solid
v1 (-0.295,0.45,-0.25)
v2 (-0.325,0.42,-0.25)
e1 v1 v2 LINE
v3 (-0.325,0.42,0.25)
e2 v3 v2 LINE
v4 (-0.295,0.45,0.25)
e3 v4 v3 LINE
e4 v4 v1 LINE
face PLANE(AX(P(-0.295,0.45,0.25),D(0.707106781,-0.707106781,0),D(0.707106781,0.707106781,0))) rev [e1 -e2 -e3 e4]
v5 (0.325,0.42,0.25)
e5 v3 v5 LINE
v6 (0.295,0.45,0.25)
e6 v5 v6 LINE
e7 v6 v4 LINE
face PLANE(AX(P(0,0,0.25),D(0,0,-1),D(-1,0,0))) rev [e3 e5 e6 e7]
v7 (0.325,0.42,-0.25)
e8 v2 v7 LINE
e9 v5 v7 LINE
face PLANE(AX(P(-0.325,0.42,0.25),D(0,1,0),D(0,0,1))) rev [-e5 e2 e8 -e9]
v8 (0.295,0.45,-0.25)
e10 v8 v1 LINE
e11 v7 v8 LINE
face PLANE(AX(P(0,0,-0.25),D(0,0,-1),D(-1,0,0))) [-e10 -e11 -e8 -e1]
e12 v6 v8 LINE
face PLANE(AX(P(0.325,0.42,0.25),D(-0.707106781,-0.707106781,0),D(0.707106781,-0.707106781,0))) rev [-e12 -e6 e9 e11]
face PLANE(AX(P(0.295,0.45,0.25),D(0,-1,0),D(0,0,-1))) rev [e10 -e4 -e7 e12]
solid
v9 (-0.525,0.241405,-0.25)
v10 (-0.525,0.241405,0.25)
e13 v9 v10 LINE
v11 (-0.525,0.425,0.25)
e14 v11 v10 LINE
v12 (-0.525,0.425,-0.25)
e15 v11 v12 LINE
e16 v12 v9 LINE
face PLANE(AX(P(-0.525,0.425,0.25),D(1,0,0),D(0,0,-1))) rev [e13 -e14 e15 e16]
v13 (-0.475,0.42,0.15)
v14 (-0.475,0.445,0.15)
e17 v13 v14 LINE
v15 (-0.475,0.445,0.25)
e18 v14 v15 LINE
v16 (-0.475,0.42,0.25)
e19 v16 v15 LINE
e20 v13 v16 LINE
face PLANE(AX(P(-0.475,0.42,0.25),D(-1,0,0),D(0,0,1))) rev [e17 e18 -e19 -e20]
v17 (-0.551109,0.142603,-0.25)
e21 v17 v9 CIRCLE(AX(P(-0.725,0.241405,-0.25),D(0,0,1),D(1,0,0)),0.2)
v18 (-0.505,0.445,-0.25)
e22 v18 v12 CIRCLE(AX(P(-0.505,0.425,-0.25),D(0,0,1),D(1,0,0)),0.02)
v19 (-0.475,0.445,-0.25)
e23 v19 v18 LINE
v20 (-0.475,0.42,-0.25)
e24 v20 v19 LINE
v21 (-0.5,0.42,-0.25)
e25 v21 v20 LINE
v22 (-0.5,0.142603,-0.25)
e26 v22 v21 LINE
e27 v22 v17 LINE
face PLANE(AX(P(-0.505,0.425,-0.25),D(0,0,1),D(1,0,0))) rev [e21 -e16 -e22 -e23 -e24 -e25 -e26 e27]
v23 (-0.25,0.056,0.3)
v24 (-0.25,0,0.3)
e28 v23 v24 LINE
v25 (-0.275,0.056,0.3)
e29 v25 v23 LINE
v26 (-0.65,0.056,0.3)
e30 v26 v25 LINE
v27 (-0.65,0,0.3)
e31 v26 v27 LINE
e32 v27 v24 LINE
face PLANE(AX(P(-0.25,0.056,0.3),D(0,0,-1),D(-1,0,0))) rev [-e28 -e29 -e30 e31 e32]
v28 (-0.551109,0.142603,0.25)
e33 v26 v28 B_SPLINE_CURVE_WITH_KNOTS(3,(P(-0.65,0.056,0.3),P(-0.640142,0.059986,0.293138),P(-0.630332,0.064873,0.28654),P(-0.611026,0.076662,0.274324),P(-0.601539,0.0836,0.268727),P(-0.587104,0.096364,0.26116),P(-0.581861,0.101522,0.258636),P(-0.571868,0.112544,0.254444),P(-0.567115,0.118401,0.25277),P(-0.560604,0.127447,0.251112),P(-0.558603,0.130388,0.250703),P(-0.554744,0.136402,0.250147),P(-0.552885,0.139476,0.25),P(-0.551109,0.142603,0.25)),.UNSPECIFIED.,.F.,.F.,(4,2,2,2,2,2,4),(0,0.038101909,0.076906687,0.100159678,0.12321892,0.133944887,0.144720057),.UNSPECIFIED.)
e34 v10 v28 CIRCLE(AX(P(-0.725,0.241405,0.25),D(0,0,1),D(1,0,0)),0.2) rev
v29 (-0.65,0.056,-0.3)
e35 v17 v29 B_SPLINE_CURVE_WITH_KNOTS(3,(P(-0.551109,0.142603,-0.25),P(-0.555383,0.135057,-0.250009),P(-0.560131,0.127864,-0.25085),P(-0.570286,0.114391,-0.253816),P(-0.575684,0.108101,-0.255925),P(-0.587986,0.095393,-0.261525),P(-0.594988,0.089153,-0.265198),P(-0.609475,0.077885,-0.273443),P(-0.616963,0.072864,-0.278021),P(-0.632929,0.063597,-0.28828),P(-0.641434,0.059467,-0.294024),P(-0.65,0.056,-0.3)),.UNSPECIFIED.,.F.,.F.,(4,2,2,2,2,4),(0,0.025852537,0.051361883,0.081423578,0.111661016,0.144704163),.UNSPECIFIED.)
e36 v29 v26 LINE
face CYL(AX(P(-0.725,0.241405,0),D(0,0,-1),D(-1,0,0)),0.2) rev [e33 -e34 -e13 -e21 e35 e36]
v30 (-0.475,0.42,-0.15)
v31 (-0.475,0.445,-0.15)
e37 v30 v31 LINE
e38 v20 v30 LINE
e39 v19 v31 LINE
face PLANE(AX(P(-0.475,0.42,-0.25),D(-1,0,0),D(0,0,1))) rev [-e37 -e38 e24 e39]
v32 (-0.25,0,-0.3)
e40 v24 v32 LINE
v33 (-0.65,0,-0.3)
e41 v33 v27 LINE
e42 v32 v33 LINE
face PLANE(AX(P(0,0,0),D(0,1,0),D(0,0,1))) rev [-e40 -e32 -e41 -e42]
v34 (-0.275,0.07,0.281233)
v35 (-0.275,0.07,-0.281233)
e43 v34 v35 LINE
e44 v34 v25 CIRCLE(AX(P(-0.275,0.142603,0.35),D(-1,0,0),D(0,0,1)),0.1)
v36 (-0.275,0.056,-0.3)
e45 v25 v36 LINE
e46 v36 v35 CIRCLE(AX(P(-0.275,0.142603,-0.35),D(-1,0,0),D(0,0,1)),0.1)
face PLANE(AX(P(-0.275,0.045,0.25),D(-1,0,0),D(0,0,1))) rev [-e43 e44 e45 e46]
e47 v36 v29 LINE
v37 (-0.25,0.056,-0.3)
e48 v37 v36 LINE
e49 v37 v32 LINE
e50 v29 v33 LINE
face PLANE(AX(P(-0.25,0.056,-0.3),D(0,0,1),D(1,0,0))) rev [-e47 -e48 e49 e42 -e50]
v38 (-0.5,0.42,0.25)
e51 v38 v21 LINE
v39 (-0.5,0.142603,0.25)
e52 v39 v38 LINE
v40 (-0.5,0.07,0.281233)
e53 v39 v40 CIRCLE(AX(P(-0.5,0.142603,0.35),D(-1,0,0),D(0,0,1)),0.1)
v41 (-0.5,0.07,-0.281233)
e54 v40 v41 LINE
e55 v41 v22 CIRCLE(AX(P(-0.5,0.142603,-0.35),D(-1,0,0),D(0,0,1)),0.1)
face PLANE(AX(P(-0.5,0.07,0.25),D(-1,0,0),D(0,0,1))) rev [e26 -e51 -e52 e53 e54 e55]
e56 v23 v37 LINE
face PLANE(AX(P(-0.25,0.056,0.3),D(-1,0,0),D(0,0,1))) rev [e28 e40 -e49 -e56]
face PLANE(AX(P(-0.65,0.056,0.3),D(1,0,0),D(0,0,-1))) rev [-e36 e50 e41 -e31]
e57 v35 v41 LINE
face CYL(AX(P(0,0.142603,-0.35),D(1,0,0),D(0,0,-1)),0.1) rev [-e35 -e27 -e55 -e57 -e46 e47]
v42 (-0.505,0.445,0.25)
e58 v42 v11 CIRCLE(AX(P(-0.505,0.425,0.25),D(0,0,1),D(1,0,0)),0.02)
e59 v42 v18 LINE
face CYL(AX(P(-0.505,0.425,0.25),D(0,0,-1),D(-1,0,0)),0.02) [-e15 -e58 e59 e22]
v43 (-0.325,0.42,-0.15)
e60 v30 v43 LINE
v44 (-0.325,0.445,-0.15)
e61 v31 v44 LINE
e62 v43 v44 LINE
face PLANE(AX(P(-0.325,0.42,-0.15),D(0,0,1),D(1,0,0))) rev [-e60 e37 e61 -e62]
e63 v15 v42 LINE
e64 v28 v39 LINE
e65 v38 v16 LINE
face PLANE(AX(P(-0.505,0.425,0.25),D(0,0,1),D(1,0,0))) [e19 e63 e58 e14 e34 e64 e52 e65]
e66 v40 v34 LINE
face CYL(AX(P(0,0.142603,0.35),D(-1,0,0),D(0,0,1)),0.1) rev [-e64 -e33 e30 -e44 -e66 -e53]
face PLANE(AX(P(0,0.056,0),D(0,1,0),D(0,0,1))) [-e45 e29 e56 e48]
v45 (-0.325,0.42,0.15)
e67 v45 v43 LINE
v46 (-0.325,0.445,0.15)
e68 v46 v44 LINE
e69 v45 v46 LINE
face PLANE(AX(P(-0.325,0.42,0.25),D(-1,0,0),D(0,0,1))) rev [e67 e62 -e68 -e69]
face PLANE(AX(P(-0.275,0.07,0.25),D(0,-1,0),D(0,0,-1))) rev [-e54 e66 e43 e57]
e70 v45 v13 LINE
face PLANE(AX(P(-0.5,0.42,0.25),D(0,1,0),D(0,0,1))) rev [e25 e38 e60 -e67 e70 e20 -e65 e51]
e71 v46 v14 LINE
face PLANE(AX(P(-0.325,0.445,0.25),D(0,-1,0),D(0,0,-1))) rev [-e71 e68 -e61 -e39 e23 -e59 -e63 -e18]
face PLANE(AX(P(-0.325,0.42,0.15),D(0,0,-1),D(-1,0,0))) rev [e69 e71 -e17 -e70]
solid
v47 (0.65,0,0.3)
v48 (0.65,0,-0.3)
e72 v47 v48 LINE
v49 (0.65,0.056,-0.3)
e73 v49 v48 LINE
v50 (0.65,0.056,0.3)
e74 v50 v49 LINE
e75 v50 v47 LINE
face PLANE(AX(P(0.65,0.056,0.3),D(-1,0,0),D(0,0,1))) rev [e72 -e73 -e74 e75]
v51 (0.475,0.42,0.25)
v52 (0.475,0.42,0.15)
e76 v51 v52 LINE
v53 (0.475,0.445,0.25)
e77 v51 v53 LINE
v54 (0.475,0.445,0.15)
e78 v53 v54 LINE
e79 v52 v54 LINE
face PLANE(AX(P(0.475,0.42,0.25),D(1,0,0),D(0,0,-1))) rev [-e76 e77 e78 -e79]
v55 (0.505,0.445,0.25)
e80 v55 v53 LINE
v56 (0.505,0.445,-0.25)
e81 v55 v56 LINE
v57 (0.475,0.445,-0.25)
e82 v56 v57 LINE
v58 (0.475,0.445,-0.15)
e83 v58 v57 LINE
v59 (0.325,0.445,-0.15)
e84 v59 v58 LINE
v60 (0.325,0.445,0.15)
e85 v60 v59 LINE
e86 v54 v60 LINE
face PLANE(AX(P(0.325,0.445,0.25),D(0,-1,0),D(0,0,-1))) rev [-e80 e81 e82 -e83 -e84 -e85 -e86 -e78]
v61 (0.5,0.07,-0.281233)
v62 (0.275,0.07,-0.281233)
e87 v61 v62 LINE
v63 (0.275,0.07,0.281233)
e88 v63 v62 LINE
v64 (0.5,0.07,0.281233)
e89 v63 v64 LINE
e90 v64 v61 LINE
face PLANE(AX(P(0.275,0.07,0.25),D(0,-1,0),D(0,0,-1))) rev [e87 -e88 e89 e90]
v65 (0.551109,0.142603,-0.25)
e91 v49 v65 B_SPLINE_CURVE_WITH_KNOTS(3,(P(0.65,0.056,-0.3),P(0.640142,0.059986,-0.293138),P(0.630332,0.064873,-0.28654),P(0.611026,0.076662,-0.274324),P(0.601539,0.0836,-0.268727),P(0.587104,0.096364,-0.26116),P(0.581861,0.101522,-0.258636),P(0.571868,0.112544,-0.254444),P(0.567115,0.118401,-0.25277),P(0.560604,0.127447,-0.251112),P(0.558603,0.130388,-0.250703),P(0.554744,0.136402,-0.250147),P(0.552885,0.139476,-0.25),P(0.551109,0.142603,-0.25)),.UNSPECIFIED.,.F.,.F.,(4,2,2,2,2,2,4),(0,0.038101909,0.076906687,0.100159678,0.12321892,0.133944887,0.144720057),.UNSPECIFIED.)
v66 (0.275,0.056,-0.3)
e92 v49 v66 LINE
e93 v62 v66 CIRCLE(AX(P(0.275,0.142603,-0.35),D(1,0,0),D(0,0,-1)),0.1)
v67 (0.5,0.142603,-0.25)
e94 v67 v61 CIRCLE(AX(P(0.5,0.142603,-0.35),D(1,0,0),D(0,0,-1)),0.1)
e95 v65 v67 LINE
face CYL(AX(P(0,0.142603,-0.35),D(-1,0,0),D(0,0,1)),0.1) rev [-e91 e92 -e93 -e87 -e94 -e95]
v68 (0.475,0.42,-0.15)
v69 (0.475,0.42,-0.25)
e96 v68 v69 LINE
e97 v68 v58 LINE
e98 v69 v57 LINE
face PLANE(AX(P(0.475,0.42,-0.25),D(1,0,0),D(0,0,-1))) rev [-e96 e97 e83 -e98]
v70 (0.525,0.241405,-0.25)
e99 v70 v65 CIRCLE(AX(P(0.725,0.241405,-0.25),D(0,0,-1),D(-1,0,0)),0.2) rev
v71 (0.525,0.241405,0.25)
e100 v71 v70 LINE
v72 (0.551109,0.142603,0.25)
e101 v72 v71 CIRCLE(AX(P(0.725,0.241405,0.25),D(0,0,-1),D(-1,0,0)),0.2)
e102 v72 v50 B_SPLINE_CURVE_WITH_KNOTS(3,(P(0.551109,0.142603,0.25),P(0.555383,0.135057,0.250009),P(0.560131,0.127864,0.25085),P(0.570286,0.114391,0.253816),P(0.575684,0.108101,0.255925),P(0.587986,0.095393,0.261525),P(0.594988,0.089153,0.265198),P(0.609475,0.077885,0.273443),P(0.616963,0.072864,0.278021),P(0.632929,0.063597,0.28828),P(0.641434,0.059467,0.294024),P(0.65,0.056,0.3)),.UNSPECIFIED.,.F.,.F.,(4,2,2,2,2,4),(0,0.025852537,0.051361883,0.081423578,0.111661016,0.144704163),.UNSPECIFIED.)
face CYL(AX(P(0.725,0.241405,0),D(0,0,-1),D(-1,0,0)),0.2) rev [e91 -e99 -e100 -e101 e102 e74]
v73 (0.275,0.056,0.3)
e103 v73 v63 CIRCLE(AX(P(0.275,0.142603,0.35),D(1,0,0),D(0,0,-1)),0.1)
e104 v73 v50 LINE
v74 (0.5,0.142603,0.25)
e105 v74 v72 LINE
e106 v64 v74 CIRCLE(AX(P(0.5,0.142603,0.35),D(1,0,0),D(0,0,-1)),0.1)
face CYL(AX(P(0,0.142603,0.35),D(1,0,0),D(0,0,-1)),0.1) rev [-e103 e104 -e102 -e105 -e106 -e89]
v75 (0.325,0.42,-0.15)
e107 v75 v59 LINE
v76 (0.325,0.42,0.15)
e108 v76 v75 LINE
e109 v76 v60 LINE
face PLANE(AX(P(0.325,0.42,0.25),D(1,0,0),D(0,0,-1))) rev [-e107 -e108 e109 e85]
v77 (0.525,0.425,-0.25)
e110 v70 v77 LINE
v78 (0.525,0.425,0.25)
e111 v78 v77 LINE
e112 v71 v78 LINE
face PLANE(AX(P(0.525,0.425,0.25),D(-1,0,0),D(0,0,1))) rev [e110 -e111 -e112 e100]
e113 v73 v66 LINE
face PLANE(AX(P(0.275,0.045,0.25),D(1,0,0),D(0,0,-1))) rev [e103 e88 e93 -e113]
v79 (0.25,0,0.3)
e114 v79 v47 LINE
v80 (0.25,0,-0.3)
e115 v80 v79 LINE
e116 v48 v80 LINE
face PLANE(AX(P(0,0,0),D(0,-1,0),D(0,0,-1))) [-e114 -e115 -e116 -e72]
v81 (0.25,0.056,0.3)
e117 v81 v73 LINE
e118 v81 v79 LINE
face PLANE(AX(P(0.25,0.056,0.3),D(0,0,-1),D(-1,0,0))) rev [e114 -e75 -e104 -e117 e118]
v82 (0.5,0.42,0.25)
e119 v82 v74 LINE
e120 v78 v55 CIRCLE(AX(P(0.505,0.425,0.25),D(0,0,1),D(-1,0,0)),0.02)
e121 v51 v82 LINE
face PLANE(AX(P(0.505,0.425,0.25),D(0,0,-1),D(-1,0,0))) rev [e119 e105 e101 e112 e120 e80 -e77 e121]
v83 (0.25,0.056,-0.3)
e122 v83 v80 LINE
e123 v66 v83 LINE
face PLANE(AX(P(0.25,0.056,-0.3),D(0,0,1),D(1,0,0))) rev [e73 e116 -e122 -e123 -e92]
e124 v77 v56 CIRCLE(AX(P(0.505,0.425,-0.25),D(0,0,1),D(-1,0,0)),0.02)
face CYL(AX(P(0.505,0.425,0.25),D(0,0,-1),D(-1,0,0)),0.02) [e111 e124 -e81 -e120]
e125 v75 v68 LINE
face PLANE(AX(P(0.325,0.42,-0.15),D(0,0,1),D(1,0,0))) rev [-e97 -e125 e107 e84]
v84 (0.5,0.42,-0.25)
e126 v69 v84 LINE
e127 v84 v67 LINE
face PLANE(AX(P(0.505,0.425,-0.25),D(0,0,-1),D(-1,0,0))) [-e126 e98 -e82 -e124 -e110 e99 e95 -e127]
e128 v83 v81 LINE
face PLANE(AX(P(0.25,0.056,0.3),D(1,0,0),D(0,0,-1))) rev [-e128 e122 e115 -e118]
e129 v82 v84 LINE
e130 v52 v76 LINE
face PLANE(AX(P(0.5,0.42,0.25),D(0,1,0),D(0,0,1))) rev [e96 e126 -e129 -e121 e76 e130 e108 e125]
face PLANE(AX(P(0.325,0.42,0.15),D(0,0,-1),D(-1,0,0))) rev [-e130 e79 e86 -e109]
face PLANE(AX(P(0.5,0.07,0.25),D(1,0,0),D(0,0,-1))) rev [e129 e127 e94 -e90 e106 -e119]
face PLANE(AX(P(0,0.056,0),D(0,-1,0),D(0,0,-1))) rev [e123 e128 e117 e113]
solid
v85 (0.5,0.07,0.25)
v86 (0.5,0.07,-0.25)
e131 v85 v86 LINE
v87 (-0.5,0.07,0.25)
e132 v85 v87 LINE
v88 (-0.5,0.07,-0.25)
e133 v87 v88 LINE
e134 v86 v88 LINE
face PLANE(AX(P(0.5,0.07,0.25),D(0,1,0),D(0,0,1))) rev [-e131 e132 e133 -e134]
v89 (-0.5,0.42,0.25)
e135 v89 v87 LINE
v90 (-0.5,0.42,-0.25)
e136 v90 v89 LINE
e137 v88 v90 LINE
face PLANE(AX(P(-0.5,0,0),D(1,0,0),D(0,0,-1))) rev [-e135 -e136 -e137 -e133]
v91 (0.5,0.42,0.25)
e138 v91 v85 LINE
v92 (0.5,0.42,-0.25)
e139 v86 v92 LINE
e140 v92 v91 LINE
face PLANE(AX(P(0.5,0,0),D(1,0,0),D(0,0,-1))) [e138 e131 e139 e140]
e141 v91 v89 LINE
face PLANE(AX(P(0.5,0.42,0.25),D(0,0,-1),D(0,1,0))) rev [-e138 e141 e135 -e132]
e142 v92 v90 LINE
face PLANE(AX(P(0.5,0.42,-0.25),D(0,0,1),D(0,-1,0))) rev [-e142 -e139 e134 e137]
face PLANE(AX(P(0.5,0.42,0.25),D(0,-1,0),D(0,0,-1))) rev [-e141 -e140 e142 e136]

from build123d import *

# Parameters (mm, degrees)
SKETCH1_W             = 0.5
SKETCH1_H             = 0.35
BOSS_EXTRUDE1_DEPTH   = 0.5
BOSS_EXTRUDE2_DEPTH   = 0.25
BOSS_EXTRUDE2_2_DEPTH = 0.25
SKETCH3_W             = 0.15
SKETCH3_H             = 0.1
CUT_EXTRUDE1_DEPTH    = 0.025
BOSS_EXTRUDE3_DEPTH   = 0.25
SKETCH7_W             = 0.4
SKETCH7_H             = 0.6
BOSS_EXTRUDE5_DEPTH   = 0.056
FILLET3_R             = 0.2
FILLET4_R             = 0.2
FILLET5_R             = 0.1
FILLET6_R             = 0.1


with BuildPart() as part:
    # Sketch1 → Boss-Extrude1 (new, symmetric)
    with BuildSketch(Plane(origin=(0, 0, 0), x_dir=(0, 0, -1), z_dir=(1, 0, 0))):
        with Locations((0, 0.245)):
            Rectangle(SKETCH1_W, SKETCH1_H)
    extrude(amount=BOSS_EXTRUDE1_DEPTH, both=True)


with BuildPart() as body_2:
    # Sketch2 → Boss-Extrude2 (new, symmetric)
    with BuildSketch(Plane.XY):
        with BuildLine():
            Line((-0.325, 0.445), (-0.505, 0.445))
            ThreePointArc((-0.505, 0.445), (-0.519142136, 0.439142136), (-0.525, 0.425))
            Line((-0.525, 0.425), (-0.525, 0.045))
            Line((-0.525, 0.045), (-0.275, 0.045))
            Line((-0.275, 0.045), (-0.275, 0.07))
            Line((-0.275, 0.07), (-0.5, 0.07))
            Line((-0.5, 0.07), (-0.5, 0.42))
            Line((-0.5, 0.42), (-0.325, 0.42))
            Line((-0.325, 0.42), (-0.325, 0.445))
        make_face()
    extrude(amount=BOSS_EXTRUDE2_DEPTH, both=True)


with BuildPart() as body_3:
    # Sketch2 → Boss-Extrude2 2 (new, symmetric)
    with BuildSketch(Plane.XY):
        with BuildLine():
            Line((0.325, 0.42), (0.325, 0.445))
            Line((0.325, 0.445), (0.505, 0.445))
            ThreePointArc((0.505, 0.445), (0.519142136, 0.439142136), (0.525, 0.425))
            Line((0.525, 0.425), (0.525, 0.045))
            Line((0.525, 0.045), (0.275, 0.045))
            Line((0.275, 0.045), (0.275, 0.07))
            Line((0.275, 0.07), (0.5, 0.07))
            Line((0.5, 0.07), (0.5, 0.42))
            Line((0.5, 0.42), (0.325, 0.42))
        make_face()
    extrude(amount=BOSS_EXTRUDE2_2_DEPTH, both=True)


with BuildPart() as cut_extrude1_tool:
    # Sketch3 → Cut-Extrude1 (new body)
    with BuildSketch(Plane(origin=(0, 0.445, 0), x_dir=(1, 0, 0), z_dir=(0, 1, 0))):
        with Locations((-0.4, 0.2)):
            Rectangle(SKETCH3_W, SKETCH3_H)
        with Locations((-0.4, -0.2)):
            Rectangle(SKETCH3_W, SKETCH3_H)
        with Locations((0.4, -0.2)):
            Rectangle(SKETCH3_W, SKETCH3_H)
        with Locations((0.4, 0.2)):
            Rectangle(SKETCH3_W, SKETCH3_H)
    extrude(amount=-CUT_EXTRUDE1_DEPTH)


with BuildPart() as body_2_1:
    add(body_2.part)

    # Cut-Extrude1: cut by cut_extrude1_tool
    add(cut_extrude1_tool.part, mode=Mode.SUBTRACT)



with BuildPart() as body_3_1:
    add(body_3.part)

    # Cut-Extrude1: cut by cut_extrude1_tool
    add(cut_extrude1_tool.part, mode=Mode.SUBTRACT)


with BuildPart() as body_4:
    # Sketch4 → Boss-Extrude3 (new, symmetric)
    with BuildSketch(Plane.XY):
        Polygon((-0.325, 0.42), (0.325, 0.42), (0.295, 0.45), (-0.295, 0.45), align=None)
    extrude(amount=BOSS_EXTRUDE3_DEPTH, both=True)


with BuildPart() as body_2_2:
    add(body_2_1.part)

    add(body_3_1.part)  # Boss-Extrude5 merges body 3
    # Sketch7 → Boss-Extrude5 (add)
    with BuildSketch(Plane(origin=(0, 0, 0), x_dir=(1, 0, 0), z_dir=(0, 1, 0))):
        with Locations((-0.45, 0)):
            Rectangle(SKETCH7_W, SKETCH7_H)
        with Locations((0.45, 0)):
            Rectangle(SKETCH7_W, SKETCH7_H)
    extrude(amount=BOSS_EXTRUDE5_DEPTH)

    # Fillet3
    # the kernel refuses this fillet: 0.2 mm, written as the material it adds along each edge
    with BuildSketch(Plane(origin=(-0.525, 0.056, -0.25), x_dir=(-1, 0, 0), z_dir=(0, 0, 1))) as fillet3_piece_1:
        with BuildLine():
            CenterArc((0.2, -0.185404962), FILLET3_R, 112.024312837, 67.975687163)
            Line((0, -0.185404962), (-0.004, -0.185404962))
            Line((-0.004, -0.185404962), (-0.004, 0))
            Line((-0.004, 0), (0, 0.004))
            ThreePointArc((0, 0.004), (0.0625, 0.004), (0.1235, 0.003708099))
            Line((0.1235, 0.003708099), (0.125, 0))
        make_face()
    extrude(amount=0.5)

    # Fillet4
    # the kernel refuses this fillet: 0.2 mm, written as the material it adds along each edge
    with BuildSketch(Plane(origin=(0.525, 0.056, 0.25), x_dir=(1, 0, 0), z_dir=(0, 0, -1))) as fillet4_piece_1:
        with BuildLine():
            CenterArc((0.2, -0.185404962), FILLET4_R, 112.024312837, 67.975687163)
            Line((0, -0.185404962), (-0.004, -0.185404962))
            Line((-0.004, -0.185404962), (-0.004, 0))
            Line((-0.004, 0), (0, 0.004))
            ThreePointArc((0, 0.004), (0.0625, 0.004), (0.1235, 0.003708099))
            Line((0.1235, 0.003708099), (0.125, 0))
        make_face()
    extrude(amount=0.5)

    # Fillet5
    # the kernel refuses this fillet: 0.1 mm, written as the material it adds along each edge
    with BuildSketch(Plane(origin=(0.65, 0.056, -0.25), x_dir=(0, 1, 0), z_dir=(-1, 0, 0))) as fillet5_piece_1_section:
        with BuildLine():
            CenterArc((0.08660254, 0.1), FILLET5_R, 210, 60)
            Line((0, 0.05), (0, 0))
            Line((0, 0), (0.08660254, 0))
        make_face()
    fillet5_piece_1 = extrude(amount=0.591506351, mode=Mode.PRIVATE)
    fillet5_piece_1 = fillet5_piece_1 - Plane(origin=(0.725, 0.241404962, -0.25), x_dir=(1, 0, 0), z_dir=(0, 0, 1)) * Cylinder(0.2, 2, mode=Mode.PRIVATE)
    fillet5_piece_1 = split(fillet5_piece_1, bisect_by=Plane(origin=(0.5, 0.056, -0.25), z_dir=(1, 0, 0)), keep=Keep.TOP, mode=Mode.PRIVATE)
    add(fillet5_piece_1)
    with BuildSketch(Plane(origin=(0.866506351, 0.056, -0.25), x_dir=(0, 1, 0), z_dir=(-1, 0, 0))) as fillet5_piece_2_section:
        with BuildLine():
            CenterArc((0.08660254, 0.1), FILLET5_R, 210, 60)
            Line((0, 0.05), (0, 0))
            Line((0, 0), (0.08660254, 0))
        make_face()
    fillet5_piece_2 = extrude(amount=0.591506351, mode=Mode.PRIVATE)
    fillet5_piece_2 = split(fillet5_piece_2, bisect_by=Plane(origin=(0.866506351, 0.07, -0.25), z_dir=(0, -1, 0)), keep=Keep.TOP, mode=Mode.PRIVATE)
    fillet5_piece_2 = split(fillet5_piece_2, bisect_by=Plane(origin=(0.5, 0.056, -0.25), z_dir=(-1, 0, 0)), keep=Keep.TOP, mode=Mode.PRIVATE)
    add(fillet5_piece_2)
    with BuildSketch(Plane(origin=(0.275, 0.056, 0.25), x_dir=(0, 2.031291801430194e-12, 1.0), z_dir=(1, 0, 0))) as fillet5_piece_3_section:
        with BuildLine():
            CenterArc((0.1, -0.08660254), FILLET5_R, 120, 60)
            Line((0, -0.08660254), (0, 0))
            Line((0, 0), (0.05, 0))
        make_face()
    fillet5_piece_3 = extrude(amount=0.375, mode=Mode.PRIVATE)
    fillet5_piece_3 = fillet5_piece_3 - Plane(origin=(0.725, 0.241404962, 0.25), x_dir=(1, 0, 0), z_dir=(0, 0, 1)) * Cylinder(0.2, 2, mode=Mode.PRIVATE)
    fillet5_piece_3 = split(fillet5_piece_3, bisect_by=Plane(origin=(0.275, 0.07, 0.25), z_dir=(0, -1, 0)), keep=Keep.TOP, mode=Mode.PRIVATE)
    add(fillet5_piece_3)
    with BuildSketch(Plane(origin=(0.058493649, 0.056, 0.25), x_dir=(0, 2.031291801430194e-12, 1.0), z_dir=(1, 0, 0))) as fillet5_piece_4_section:
        with BuildLine():
            CenterArc((0.1, -0.08660254), FILLET5_R, 120, 60)
            Line((0, -0.08660254), (0, 0))
            Line((0, 0), (0.05, 0))
        make_face()
    fillet5_piece_4 = extrude(amount=0.591506351, mode=Mode.PRIVATE)
    fillet5_piece_4 = fillet5_piece_4 - Plane(origin=(0.725, 0.241404962, 0.25), x_dir=(1, 0, 0), z_dir=(0, 0, 1)) * Cylinder(0.2, 2, mode=Mode.PRIVATE)
    fillet5_piece_4 = split(fillet5_piece_4, bisect_by=Plane(origin=(0.5, 0.056, 0.25), z_dir=(1, 0, 0)), keep=Keep.TOP, mode=Mode.PRIVATE)
    add(fillet5_piece_4)

    # Fillet6
    # the kernel refuses this fillet: 0.1 mm, written as the material it adds along each edge
    with BuildSketch(Plane(origin=(-0.65, 0.056, 0.25), x_dir=(0, 1, 0), z_dir=(1, 0, 0))) as fillet6_piece_1_section:
        with BuildLine():
            CenterArc((0.08660254, 0.1), FILLET6_R, 210, 60)
            Line((0, 0.05), (0, 0))
            Line((0, 0), (0.08660254, 0))
        make_face()
    fillet6_piece_1 = extrude(amount=0.591506351, mode=Mode.PRIVATE)
    fillet6_piece_1 = fillet6_piece_1 - Plane(origin=(-0.725, 0.241404962, 0.25), x_dir=(-1, 0, 0), z_dir=(0, 0, -1)) * Cylinder(0.2, 2, mode=Mode.PRIVATE)
    fillet6_piece_1 = split(fillet6_piece_1, bisect_by=Plane(origin=(-0.5, 0.056, 0.25), z_dir=(-1, 0, 0)), keep=Keep.TOP, mode=Mode.PRIVATE)
    add(fillet6_piece_1)
    with BuildSketch(Plane(origin=(-0.866506351, 0.056, 0.25), x_dir=(0, 1, 0), z_dir=(1, 0, 0))) as fillet6_piece_2_section:
        with BuildLine():
            CenterArc((0.08660254, 0.1), FILLET6_R, 210, 60)
            Line((0, 0.05), (0, 0))
            Line((0, 0), (0.08660254, 0))
        make_face()
    fillet6_piece_2 = extrude(amount=0.591506351, mode=Mode.PRIVATE)
    fillet6_piece_2 = split(fillet6_piece_2, bisect_by=Plane(origin=(-0.866506351, 0.07, 0.25), z_dir=(0, -1, 0)), keep=Keep.TOP, mode=Mode.PRIVATE)
    fillet6_piece_2 = split(fillet6_piece_2, bisect_by=Plane(origin=(-0.5, 0.056, 0.25), z_dir=(1, 0, 0)), keep=Keep.TOP, mode=Mode.PRIVATE)
    add(fillet6_piece_2)
    with BuildSketch(Plane(origin=(-0.275, 0.056, -0.25), x_dir=(0, 2.0315693571863432e-12, -1.0), z_dir=(-1, 0, 0))) as fillet6_piece_3_section:
        with BuildLine():
            CenterArc((0.1, -0.08660254), FILLET6_R, 120, 60)
            Line((0, -0.08660254), (0, 0))
            Line((0, 0), (0.05, 0))
        make_face()
    fillet6_piece_3 = extrude(amount=0.375, mode=Mode.PRIVATE)
    fillet6_piece_3 = fillet6_piece_3 - Plane(origin=(-0.725, 0.241404962, -0.25), x_dir=(-1, 0, 0), z_dir=(0, 0, -1)) * Cylinder(0.2, 2, mode=Mode.PRIVATE)
    fillet6_piece_3 = split(fillet6_piece_3, bisect_by=Plane(origin=(-0.275, 0.07, -0.25), z_dir=(0, -1, 0)), keep=Keep.TOP, mode=Mode.PRIVATE)
    add(fillet6_piece_3)
    with BuildSketch(Plane(origin=(-0.058493649, 0.056, -0.25), x_dir=(0, 2.0315693571863432e-12, -1.0), z_dir=(-1, 0, 0))) as fillet6_piece_4_section:
        with BuildLine():
            CenterArc((0.1, -0.08660254), FILLET6_R, 120, 60)
            Line((0, -0.08660254), (0, 0))
            Line((0, 0), (0.05, 0))
        make_face()
    fillet6_piece_4 = extrude(amount=0.591506351, mode=Mode.PRIVATE)
    fillet6_piece_4 = fillet6_piece_4 - Plane(origin=(-0.725, 0.241404962, -0.25), x_dir=(-1, 0, 0), z_dir=(0, 0, -1)) * Cylinder(0.2, 2, mode=Mode.PRIVATE)
    fillet6_piece_4 = split(fillet6_piece_4, bisect_by=Plane(origin=(-0.5, 0.056, -0.25), z_dir=(-1, 0, 0)), keep=Keep.TOP, mode=Mode.PRIVATE)
    add(fillet6_piece_4)


solid = Compound([part.part, body_4.part, body_2_2.part])
